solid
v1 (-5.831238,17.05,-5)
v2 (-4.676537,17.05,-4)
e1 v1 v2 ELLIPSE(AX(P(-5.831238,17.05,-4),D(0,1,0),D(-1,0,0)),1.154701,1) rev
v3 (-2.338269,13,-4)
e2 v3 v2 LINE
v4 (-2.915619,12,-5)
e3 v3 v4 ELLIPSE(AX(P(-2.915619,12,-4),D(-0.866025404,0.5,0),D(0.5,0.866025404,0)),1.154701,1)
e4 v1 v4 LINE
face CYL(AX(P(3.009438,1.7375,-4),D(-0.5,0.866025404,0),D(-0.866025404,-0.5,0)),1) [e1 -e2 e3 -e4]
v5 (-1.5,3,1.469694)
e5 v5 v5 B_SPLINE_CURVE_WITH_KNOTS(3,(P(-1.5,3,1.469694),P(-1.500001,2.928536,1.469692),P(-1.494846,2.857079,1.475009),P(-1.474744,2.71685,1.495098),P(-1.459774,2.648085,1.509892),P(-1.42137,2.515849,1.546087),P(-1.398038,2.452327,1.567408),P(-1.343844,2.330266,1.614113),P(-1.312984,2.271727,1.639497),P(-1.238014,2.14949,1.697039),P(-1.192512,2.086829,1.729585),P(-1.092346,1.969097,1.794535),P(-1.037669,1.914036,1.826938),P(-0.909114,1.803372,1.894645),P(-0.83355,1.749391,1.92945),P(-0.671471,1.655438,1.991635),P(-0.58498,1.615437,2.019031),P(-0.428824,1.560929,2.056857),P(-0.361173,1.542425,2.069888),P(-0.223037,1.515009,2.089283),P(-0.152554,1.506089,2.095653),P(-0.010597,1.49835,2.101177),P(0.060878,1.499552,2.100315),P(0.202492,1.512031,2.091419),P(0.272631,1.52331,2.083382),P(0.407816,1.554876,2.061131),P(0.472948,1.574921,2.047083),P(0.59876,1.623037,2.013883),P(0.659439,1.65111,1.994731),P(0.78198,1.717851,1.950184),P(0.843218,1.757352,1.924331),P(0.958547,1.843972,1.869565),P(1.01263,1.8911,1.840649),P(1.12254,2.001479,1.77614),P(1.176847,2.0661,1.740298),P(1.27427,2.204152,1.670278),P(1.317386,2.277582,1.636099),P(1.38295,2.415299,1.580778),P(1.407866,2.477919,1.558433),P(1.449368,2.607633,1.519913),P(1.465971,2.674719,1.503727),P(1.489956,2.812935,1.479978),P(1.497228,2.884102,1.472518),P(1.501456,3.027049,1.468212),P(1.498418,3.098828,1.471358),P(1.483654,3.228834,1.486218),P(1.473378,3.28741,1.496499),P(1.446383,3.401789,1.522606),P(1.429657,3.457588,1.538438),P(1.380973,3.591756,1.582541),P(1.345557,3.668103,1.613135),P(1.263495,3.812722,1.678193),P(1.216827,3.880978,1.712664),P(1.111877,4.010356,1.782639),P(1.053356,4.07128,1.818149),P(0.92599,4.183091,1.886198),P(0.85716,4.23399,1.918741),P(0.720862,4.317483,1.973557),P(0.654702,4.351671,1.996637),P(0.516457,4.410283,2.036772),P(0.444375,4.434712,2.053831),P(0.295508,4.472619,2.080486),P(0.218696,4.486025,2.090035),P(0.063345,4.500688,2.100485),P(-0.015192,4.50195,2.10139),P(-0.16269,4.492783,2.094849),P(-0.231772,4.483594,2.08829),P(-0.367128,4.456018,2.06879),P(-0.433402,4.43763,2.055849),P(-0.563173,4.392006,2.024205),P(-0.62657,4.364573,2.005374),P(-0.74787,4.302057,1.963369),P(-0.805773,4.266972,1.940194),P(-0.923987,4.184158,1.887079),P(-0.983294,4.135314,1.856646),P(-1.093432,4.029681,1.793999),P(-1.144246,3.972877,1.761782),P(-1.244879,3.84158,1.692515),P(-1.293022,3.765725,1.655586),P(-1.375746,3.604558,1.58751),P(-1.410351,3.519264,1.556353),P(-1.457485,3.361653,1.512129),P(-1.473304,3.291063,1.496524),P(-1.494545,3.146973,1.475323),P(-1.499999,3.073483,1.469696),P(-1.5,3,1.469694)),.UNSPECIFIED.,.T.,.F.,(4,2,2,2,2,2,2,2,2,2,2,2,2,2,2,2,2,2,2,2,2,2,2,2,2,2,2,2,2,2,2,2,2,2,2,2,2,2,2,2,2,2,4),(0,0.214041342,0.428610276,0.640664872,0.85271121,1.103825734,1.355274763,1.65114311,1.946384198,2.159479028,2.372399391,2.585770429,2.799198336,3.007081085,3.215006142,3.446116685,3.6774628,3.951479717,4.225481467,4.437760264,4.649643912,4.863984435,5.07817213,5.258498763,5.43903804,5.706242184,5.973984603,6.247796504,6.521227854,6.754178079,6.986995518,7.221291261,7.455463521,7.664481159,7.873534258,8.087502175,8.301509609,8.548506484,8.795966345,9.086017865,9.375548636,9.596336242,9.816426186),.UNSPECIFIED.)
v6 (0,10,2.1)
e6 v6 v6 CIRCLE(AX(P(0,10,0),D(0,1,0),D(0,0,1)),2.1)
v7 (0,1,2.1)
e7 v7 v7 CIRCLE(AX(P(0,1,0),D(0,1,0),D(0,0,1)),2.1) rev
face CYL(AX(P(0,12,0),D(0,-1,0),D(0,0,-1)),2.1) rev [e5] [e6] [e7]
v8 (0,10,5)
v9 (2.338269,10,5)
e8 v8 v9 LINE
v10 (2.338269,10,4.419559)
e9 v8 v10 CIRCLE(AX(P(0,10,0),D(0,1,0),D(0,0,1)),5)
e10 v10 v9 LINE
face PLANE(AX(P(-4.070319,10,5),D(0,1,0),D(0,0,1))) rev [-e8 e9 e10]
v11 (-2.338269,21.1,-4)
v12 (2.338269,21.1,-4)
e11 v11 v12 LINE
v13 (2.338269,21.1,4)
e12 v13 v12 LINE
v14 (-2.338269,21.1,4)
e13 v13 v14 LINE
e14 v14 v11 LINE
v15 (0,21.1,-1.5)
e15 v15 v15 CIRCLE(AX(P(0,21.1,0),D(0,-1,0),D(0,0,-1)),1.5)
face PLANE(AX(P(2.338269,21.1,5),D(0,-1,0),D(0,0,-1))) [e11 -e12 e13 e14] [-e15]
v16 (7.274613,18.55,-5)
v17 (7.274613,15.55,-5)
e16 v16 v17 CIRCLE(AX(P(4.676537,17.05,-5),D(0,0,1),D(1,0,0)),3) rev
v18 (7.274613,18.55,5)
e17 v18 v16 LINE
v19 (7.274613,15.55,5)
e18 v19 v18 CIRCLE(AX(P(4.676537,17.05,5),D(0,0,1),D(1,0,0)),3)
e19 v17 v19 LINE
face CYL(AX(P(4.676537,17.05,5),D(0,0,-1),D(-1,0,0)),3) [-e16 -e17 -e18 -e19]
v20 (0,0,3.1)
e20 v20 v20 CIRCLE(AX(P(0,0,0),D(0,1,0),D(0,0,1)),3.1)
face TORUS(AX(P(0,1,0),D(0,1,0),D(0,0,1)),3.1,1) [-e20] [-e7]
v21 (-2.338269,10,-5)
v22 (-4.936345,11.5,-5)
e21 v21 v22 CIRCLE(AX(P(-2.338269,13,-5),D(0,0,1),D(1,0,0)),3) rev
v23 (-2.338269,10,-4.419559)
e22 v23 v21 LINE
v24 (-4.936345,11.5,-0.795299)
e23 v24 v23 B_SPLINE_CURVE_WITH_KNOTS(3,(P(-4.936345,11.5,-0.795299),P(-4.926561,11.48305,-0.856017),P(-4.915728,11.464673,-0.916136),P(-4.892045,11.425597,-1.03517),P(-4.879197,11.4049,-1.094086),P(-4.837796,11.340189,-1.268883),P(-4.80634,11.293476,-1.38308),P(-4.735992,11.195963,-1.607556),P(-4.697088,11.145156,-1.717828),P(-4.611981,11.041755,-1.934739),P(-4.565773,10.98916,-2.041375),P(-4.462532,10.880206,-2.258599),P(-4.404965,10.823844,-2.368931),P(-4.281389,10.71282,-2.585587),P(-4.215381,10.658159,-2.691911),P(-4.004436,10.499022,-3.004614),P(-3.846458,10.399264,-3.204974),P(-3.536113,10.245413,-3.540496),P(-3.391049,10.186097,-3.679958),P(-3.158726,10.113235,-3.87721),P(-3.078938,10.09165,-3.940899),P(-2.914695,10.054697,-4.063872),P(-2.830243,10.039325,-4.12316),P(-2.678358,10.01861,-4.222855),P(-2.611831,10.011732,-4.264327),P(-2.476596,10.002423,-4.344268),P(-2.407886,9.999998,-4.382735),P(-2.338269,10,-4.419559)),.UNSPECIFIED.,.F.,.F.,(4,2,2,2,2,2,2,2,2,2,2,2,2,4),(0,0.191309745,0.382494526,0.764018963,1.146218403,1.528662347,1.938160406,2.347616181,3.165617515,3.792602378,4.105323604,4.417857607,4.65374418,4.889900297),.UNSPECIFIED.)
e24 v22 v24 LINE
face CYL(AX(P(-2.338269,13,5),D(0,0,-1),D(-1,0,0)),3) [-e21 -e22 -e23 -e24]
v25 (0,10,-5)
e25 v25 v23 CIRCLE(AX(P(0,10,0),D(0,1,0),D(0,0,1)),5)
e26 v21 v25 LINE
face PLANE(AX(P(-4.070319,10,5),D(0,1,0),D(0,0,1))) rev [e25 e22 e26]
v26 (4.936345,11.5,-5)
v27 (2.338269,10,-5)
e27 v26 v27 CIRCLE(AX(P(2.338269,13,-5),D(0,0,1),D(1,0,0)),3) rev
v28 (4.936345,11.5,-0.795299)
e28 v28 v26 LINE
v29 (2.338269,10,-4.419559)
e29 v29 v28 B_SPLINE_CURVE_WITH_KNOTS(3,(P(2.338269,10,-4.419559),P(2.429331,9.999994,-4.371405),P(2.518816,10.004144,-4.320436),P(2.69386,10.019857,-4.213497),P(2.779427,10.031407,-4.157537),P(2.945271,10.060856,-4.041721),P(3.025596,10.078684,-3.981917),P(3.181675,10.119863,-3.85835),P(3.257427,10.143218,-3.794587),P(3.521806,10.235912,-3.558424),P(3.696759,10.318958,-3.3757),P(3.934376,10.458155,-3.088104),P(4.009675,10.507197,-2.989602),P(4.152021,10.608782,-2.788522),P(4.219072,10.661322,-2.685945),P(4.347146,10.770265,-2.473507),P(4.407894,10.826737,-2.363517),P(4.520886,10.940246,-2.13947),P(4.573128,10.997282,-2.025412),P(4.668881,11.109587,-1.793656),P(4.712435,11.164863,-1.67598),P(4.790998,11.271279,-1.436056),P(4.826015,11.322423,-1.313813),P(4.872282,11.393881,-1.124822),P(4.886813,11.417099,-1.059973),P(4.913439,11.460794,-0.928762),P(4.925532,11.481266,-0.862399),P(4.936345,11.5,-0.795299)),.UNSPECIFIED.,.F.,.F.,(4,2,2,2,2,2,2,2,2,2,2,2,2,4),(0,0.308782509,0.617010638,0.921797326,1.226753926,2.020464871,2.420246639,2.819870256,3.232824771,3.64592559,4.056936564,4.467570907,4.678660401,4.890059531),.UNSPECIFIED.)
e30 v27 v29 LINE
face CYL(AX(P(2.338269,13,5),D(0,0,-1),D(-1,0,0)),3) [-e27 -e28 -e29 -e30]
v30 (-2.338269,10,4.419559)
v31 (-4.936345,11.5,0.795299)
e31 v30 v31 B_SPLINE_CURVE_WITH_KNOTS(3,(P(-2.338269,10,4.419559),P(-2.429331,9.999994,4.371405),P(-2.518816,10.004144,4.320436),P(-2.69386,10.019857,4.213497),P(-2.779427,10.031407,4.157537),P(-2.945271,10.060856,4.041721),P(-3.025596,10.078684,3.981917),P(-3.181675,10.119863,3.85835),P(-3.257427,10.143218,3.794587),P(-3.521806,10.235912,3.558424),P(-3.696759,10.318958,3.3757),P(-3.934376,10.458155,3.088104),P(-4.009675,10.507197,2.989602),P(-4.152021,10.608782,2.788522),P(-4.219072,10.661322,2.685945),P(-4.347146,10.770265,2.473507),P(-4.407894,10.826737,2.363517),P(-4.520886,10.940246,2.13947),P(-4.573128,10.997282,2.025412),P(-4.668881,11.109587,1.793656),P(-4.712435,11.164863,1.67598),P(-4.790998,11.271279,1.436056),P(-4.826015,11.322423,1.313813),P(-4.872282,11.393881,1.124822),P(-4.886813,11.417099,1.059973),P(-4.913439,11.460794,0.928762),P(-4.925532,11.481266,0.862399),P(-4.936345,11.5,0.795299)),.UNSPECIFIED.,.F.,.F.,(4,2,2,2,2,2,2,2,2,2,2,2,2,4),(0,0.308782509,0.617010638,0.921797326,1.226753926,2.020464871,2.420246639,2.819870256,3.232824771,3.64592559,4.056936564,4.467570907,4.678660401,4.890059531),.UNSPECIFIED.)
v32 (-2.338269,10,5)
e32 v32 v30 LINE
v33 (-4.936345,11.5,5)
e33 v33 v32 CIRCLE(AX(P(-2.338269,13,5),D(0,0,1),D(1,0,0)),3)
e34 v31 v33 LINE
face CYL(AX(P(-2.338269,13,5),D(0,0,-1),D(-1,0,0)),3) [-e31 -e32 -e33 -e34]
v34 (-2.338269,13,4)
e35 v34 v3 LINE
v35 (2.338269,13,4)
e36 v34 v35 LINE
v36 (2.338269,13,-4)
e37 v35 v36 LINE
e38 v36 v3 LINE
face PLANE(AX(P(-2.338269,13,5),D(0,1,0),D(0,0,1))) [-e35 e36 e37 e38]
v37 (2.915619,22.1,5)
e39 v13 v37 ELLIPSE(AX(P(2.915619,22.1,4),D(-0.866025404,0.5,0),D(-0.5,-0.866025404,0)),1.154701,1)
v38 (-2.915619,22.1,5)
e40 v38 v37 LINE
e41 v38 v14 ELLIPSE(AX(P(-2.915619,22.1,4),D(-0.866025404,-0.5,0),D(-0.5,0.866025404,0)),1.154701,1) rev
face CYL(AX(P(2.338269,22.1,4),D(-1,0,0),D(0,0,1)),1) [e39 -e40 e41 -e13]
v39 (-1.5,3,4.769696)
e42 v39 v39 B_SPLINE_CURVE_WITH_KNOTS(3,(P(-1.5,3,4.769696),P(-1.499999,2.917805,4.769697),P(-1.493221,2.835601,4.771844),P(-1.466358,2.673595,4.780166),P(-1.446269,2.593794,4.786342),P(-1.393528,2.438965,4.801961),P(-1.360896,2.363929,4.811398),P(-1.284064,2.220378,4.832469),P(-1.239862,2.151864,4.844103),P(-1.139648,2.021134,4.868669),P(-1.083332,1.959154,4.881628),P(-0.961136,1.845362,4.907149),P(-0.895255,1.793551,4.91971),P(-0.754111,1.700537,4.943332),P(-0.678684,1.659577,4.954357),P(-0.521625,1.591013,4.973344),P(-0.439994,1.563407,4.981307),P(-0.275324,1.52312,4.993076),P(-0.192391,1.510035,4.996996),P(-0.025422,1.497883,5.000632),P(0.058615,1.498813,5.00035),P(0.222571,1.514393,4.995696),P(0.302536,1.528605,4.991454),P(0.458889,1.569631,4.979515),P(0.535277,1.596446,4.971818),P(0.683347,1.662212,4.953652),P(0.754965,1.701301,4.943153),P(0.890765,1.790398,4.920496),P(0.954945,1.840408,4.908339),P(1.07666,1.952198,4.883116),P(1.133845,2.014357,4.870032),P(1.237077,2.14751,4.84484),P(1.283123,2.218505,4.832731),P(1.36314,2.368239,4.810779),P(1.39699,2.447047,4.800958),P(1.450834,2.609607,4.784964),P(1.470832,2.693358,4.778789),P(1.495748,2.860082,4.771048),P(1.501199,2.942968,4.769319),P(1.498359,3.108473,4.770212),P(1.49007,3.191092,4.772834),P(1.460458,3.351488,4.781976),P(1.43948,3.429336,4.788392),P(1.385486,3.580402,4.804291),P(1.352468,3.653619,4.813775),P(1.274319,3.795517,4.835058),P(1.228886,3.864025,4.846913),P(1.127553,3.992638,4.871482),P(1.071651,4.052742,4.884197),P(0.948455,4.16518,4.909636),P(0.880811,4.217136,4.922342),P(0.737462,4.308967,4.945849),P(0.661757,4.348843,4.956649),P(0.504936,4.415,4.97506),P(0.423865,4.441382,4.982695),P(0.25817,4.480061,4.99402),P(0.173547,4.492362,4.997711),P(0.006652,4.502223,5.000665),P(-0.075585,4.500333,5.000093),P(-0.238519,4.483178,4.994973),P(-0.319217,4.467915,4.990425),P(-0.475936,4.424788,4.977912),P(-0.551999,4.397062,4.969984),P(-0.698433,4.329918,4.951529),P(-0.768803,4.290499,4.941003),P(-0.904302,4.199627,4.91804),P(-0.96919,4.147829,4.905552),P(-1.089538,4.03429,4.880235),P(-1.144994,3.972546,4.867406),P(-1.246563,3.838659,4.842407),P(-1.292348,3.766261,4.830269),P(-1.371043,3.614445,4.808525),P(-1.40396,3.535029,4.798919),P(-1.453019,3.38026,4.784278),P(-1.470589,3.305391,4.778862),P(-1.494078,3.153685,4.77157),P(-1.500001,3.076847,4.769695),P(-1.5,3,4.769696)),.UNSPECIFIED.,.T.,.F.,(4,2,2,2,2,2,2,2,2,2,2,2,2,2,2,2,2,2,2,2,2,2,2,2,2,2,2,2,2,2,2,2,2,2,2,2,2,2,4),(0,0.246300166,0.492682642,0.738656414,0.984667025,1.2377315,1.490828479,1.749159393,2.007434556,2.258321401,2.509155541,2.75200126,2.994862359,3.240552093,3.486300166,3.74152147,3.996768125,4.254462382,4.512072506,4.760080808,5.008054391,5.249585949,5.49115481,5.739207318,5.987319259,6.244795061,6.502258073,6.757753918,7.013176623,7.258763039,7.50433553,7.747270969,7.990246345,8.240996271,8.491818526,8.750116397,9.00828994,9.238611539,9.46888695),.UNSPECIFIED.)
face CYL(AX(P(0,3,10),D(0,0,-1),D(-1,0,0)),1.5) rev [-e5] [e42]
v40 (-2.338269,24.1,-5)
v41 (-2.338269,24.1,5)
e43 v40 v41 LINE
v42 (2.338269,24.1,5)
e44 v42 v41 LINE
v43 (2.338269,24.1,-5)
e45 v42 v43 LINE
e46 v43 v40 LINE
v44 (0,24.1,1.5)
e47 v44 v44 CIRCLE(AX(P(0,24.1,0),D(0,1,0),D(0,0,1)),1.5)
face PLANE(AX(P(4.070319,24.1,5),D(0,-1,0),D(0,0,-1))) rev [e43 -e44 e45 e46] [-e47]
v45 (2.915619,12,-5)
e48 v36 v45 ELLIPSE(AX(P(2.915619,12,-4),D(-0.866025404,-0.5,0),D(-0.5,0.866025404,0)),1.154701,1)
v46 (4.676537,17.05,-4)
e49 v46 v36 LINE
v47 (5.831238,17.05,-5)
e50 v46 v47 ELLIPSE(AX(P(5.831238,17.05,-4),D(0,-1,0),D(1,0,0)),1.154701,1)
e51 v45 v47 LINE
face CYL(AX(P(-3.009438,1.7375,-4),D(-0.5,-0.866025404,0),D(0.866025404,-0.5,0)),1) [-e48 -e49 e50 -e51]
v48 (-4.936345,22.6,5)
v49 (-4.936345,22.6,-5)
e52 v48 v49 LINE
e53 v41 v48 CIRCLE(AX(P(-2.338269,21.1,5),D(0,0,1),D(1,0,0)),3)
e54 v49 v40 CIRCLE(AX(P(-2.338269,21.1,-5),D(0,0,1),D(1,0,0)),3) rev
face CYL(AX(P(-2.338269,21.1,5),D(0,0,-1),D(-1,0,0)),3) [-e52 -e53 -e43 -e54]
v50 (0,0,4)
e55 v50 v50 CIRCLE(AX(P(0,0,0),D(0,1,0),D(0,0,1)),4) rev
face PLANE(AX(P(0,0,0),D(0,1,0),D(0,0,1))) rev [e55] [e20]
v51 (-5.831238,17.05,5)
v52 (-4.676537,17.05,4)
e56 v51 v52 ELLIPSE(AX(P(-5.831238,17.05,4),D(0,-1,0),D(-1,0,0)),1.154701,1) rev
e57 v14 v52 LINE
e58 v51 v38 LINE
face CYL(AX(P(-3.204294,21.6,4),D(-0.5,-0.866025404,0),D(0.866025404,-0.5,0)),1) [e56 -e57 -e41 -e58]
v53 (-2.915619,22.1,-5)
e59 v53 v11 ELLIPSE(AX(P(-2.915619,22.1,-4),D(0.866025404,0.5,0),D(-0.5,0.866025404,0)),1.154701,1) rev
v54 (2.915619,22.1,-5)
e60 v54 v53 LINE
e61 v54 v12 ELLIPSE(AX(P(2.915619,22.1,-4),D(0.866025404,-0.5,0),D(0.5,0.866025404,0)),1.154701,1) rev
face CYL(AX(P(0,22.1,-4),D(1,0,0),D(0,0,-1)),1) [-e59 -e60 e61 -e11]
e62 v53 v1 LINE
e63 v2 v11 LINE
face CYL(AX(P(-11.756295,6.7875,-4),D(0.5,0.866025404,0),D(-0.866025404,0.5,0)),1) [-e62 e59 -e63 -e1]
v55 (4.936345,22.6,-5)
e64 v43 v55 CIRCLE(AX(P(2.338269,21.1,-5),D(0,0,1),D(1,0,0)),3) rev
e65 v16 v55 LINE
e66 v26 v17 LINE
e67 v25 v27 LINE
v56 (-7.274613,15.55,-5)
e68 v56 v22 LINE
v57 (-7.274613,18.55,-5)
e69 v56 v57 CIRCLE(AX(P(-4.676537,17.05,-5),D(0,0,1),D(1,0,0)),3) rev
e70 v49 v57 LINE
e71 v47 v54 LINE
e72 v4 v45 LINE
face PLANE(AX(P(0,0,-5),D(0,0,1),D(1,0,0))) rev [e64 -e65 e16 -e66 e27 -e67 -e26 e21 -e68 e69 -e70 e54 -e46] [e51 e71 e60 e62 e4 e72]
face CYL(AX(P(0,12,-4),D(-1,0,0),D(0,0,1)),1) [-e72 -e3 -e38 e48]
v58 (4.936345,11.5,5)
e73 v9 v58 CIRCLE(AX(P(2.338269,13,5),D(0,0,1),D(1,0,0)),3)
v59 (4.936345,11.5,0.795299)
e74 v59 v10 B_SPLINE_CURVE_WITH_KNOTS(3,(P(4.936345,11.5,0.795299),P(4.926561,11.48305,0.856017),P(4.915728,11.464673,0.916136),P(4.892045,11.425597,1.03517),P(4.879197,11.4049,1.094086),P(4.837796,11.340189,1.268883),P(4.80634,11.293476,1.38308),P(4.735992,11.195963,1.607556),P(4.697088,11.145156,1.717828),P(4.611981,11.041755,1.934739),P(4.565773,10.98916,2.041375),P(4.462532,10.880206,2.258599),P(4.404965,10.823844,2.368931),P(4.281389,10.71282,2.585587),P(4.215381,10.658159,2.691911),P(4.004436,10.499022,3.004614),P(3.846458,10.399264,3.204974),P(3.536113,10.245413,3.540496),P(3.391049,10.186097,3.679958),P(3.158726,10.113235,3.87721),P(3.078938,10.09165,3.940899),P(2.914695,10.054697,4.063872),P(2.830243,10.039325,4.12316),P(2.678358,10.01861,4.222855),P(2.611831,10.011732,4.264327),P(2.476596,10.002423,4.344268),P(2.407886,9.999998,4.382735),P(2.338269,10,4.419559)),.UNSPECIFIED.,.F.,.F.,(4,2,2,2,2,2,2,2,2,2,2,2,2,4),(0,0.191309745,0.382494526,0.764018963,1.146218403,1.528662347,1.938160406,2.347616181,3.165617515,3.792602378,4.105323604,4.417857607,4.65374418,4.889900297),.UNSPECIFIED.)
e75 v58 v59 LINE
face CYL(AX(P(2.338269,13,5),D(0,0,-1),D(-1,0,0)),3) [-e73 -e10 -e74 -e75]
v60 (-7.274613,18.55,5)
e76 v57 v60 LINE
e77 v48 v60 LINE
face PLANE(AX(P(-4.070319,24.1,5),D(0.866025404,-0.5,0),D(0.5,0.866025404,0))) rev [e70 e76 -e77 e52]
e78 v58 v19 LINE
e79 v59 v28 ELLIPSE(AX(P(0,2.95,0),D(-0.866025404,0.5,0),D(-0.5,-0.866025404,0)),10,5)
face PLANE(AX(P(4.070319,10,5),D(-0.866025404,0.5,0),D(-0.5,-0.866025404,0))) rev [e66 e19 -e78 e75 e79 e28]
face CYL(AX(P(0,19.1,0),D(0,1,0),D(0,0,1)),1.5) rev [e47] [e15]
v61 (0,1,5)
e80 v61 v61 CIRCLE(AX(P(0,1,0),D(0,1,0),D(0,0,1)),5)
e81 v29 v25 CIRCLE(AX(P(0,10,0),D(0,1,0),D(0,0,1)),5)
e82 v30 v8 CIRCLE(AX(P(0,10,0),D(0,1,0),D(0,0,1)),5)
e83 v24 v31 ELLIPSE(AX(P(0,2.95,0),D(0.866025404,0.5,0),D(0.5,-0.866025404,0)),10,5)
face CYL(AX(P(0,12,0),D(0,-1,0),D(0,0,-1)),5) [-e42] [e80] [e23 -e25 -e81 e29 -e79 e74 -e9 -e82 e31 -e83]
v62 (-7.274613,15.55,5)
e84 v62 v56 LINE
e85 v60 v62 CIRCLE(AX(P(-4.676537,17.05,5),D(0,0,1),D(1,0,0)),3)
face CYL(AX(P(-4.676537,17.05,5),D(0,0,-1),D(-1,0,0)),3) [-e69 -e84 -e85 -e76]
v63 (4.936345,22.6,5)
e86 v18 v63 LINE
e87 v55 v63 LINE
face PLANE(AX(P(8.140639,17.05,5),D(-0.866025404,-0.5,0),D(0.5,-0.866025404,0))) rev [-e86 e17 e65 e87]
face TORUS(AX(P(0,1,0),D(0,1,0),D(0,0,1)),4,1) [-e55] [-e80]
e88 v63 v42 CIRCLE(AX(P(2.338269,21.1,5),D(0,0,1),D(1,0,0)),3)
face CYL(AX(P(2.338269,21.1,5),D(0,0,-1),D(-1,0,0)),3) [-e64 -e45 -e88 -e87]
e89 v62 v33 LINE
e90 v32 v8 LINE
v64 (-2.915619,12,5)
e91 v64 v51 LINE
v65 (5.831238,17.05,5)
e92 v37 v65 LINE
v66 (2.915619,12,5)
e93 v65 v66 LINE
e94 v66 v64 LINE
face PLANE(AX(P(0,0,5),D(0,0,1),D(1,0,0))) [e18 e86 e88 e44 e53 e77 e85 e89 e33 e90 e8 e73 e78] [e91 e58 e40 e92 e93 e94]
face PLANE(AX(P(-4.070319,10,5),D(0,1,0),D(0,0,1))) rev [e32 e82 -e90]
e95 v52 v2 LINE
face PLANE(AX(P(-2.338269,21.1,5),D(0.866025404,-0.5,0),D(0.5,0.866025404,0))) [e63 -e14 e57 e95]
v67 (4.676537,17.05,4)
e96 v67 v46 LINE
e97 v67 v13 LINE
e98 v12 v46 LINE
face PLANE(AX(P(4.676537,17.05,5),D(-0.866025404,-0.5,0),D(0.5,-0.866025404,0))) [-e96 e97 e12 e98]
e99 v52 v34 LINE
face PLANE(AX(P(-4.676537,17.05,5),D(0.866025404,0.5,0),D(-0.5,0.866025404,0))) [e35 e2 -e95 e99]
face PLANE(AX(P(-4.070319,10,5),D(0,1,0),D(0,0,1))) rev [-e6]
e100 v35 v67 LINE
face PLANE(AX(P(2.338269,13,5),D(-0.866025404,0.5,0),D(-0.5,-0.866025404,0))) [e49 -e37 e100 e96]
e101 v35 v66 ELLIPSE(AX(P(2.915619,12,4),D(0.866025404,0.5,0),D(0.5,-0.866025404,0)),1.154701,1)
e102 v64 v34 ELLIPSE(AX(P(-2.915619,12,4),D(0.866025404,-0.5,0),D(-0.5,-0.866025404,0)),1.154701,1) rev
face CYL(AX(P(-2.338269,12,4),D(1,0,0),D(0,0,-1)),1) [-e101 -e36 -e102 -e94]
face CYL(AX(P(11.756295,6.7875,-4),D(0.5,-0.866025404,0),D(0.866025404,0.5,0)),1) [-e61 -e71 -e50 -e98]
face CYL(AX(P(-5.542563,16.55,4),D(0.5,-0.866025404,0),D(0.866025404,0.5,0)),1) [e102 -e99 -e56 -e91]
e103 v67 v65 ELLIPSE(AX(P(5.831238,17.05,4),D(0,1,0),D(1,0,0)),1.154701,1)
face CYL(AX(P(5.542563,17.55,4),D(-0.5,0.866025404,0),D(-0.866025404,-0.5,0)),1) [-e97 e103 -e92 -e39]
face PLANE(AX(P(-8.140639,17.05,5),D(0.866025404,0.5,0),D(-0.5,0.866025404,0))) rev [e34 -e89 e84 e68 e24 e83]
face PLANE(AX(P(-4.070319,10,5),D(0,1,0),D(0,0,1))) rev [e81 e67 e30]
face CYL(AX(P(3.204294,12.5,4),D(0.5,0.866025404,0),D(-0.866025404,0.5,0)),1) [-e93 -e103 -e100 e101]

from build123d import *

# Parameters (mm, degrees)
ESBO_O1_R                = 5
ESBO_O1_R_2              = 2.1
RESSALTO_EXTRUS_O1_DEPTH = 12
ESBO_O2_R                = 1.5
CORTE_EXTRUS_O1_DEPTH    = 10
RESSALTO_EXTRUS_O2_DEPTH = 5
ESBO_O4_R                = 1.5
CORTE_EXTRUS_O2_DEPTH    = 5
FILETE1_R                = 1
FILETE2_R                = 3


with BuildPart() as part:
    # Esboço1 → Ressalto-extrusão1 (new body)
    with BuildSketch(Plane(origin=(0, 0, 0), x_dir=(1, 0, 0), z_dir=(0, 1, 0))):
        with Locations(Location((0, 0, 0), (0, 0, 270))):
            Circle(ESBO_O1_R)
        with Locations(Location((0, 0, 0), (0, 0, 270))):
            Circle(ESBO_O1_R_2, mode=Mode.SUBTRACT)
    extrude(amount=RESSALTO_EXTRUS_O1_DEPTH)

    # Esboço2 → Corte-extrusão1 (cut)
    with BuildSketch(Plane.XY):
        with Locations(Location((0, 3, 0), (0, 0, 180))):
            Circle(ESBO_O2_R)
    extrude(amount=CORTE_EXTRUS_O1_DEPTH, mode=Mode.SUBTRACT)

    # Esboço3 → Ressalto-extrusão2 (add, symmetric)
    with BuildSketch(Plane.XY):
        Polygon((4.070319398, 10), (8.140638796, 17.05), (4.070319398, 24.1), (-4.070319398, 24.1), (-8.140638796, 17.05), (-4.070319398, 10), align=None)
        Polygon((2.33826859, 13), (4.67653718, 17.05), (2.33826859, 21.1), (-2.33826859, 21.1), (-4.67653718, 17.05), (-2.33826859, 13), align=None, mode=Mode.SUBTRACT)
    extrude(amount=RESSALTO_EXTRUS_O2_DEPTH, both=True)

    # Esboço4 → Corte-extrusão2 (cut)
    with BuildSketch(Plane(origin=(0, 24.1, 0), x_dir=(1, 0, 0), z_dir=(0, 1, 0))):
        with Locations(Location((0, 0, 0), (0, 0, 270))):
            Circle(ESBO_O4_R)
    extrude(amount=-CORTE_EXTRUS_O2_DEPTH, mode=Mode.SUBTRACT)

    # Filete1
    filete1_edges = [part.edges().sort_by_distance(p)[0] for p in [
        (0, 0, -5),
        (0, 13, -5),
        (3.507402885, 15.025, -5),
        (3.507402885, 19.075, -5),
        (0, 21.1, -5),
        (-3.507402885, 19.075, -5),
        (-3.507402885, 15.025, -5),
        (0, 13, 5),
        (3.507402885, 15.025, 5),
        (3.507402885, 19.075, 5),
        (0, 21.1, 5),
        (-3.507402885, 19.075, 5),
        (-3.507402885, 15.025, 5),
        (0, 0, -2.1),
    ]]
    fillet(filete1_edges, radius=FILETE1_R - 0.0001)  # a hair under: the kernel refuses the full size

    # Filete2
    filete2_edges = [part.edges().sort_by_distance(p)[0] for p in [
        (-4.070319398, 10, -3.95193836),
        (-4.070319398, 10, 3.95193836),
        (8.140638796, 17.05, 0),
        (4.070319398, 10, 3.95193836),
        (4.070319398, 10, -3.95193836),
        (4.070319398, 24.1, 0),
        (-4.070319398, 24.1, 0),
        (-8.140638796, 17.05, 0),
    ]]
    fillet(filete2_edges, radius=FILETE2_R)


solid = part.part
